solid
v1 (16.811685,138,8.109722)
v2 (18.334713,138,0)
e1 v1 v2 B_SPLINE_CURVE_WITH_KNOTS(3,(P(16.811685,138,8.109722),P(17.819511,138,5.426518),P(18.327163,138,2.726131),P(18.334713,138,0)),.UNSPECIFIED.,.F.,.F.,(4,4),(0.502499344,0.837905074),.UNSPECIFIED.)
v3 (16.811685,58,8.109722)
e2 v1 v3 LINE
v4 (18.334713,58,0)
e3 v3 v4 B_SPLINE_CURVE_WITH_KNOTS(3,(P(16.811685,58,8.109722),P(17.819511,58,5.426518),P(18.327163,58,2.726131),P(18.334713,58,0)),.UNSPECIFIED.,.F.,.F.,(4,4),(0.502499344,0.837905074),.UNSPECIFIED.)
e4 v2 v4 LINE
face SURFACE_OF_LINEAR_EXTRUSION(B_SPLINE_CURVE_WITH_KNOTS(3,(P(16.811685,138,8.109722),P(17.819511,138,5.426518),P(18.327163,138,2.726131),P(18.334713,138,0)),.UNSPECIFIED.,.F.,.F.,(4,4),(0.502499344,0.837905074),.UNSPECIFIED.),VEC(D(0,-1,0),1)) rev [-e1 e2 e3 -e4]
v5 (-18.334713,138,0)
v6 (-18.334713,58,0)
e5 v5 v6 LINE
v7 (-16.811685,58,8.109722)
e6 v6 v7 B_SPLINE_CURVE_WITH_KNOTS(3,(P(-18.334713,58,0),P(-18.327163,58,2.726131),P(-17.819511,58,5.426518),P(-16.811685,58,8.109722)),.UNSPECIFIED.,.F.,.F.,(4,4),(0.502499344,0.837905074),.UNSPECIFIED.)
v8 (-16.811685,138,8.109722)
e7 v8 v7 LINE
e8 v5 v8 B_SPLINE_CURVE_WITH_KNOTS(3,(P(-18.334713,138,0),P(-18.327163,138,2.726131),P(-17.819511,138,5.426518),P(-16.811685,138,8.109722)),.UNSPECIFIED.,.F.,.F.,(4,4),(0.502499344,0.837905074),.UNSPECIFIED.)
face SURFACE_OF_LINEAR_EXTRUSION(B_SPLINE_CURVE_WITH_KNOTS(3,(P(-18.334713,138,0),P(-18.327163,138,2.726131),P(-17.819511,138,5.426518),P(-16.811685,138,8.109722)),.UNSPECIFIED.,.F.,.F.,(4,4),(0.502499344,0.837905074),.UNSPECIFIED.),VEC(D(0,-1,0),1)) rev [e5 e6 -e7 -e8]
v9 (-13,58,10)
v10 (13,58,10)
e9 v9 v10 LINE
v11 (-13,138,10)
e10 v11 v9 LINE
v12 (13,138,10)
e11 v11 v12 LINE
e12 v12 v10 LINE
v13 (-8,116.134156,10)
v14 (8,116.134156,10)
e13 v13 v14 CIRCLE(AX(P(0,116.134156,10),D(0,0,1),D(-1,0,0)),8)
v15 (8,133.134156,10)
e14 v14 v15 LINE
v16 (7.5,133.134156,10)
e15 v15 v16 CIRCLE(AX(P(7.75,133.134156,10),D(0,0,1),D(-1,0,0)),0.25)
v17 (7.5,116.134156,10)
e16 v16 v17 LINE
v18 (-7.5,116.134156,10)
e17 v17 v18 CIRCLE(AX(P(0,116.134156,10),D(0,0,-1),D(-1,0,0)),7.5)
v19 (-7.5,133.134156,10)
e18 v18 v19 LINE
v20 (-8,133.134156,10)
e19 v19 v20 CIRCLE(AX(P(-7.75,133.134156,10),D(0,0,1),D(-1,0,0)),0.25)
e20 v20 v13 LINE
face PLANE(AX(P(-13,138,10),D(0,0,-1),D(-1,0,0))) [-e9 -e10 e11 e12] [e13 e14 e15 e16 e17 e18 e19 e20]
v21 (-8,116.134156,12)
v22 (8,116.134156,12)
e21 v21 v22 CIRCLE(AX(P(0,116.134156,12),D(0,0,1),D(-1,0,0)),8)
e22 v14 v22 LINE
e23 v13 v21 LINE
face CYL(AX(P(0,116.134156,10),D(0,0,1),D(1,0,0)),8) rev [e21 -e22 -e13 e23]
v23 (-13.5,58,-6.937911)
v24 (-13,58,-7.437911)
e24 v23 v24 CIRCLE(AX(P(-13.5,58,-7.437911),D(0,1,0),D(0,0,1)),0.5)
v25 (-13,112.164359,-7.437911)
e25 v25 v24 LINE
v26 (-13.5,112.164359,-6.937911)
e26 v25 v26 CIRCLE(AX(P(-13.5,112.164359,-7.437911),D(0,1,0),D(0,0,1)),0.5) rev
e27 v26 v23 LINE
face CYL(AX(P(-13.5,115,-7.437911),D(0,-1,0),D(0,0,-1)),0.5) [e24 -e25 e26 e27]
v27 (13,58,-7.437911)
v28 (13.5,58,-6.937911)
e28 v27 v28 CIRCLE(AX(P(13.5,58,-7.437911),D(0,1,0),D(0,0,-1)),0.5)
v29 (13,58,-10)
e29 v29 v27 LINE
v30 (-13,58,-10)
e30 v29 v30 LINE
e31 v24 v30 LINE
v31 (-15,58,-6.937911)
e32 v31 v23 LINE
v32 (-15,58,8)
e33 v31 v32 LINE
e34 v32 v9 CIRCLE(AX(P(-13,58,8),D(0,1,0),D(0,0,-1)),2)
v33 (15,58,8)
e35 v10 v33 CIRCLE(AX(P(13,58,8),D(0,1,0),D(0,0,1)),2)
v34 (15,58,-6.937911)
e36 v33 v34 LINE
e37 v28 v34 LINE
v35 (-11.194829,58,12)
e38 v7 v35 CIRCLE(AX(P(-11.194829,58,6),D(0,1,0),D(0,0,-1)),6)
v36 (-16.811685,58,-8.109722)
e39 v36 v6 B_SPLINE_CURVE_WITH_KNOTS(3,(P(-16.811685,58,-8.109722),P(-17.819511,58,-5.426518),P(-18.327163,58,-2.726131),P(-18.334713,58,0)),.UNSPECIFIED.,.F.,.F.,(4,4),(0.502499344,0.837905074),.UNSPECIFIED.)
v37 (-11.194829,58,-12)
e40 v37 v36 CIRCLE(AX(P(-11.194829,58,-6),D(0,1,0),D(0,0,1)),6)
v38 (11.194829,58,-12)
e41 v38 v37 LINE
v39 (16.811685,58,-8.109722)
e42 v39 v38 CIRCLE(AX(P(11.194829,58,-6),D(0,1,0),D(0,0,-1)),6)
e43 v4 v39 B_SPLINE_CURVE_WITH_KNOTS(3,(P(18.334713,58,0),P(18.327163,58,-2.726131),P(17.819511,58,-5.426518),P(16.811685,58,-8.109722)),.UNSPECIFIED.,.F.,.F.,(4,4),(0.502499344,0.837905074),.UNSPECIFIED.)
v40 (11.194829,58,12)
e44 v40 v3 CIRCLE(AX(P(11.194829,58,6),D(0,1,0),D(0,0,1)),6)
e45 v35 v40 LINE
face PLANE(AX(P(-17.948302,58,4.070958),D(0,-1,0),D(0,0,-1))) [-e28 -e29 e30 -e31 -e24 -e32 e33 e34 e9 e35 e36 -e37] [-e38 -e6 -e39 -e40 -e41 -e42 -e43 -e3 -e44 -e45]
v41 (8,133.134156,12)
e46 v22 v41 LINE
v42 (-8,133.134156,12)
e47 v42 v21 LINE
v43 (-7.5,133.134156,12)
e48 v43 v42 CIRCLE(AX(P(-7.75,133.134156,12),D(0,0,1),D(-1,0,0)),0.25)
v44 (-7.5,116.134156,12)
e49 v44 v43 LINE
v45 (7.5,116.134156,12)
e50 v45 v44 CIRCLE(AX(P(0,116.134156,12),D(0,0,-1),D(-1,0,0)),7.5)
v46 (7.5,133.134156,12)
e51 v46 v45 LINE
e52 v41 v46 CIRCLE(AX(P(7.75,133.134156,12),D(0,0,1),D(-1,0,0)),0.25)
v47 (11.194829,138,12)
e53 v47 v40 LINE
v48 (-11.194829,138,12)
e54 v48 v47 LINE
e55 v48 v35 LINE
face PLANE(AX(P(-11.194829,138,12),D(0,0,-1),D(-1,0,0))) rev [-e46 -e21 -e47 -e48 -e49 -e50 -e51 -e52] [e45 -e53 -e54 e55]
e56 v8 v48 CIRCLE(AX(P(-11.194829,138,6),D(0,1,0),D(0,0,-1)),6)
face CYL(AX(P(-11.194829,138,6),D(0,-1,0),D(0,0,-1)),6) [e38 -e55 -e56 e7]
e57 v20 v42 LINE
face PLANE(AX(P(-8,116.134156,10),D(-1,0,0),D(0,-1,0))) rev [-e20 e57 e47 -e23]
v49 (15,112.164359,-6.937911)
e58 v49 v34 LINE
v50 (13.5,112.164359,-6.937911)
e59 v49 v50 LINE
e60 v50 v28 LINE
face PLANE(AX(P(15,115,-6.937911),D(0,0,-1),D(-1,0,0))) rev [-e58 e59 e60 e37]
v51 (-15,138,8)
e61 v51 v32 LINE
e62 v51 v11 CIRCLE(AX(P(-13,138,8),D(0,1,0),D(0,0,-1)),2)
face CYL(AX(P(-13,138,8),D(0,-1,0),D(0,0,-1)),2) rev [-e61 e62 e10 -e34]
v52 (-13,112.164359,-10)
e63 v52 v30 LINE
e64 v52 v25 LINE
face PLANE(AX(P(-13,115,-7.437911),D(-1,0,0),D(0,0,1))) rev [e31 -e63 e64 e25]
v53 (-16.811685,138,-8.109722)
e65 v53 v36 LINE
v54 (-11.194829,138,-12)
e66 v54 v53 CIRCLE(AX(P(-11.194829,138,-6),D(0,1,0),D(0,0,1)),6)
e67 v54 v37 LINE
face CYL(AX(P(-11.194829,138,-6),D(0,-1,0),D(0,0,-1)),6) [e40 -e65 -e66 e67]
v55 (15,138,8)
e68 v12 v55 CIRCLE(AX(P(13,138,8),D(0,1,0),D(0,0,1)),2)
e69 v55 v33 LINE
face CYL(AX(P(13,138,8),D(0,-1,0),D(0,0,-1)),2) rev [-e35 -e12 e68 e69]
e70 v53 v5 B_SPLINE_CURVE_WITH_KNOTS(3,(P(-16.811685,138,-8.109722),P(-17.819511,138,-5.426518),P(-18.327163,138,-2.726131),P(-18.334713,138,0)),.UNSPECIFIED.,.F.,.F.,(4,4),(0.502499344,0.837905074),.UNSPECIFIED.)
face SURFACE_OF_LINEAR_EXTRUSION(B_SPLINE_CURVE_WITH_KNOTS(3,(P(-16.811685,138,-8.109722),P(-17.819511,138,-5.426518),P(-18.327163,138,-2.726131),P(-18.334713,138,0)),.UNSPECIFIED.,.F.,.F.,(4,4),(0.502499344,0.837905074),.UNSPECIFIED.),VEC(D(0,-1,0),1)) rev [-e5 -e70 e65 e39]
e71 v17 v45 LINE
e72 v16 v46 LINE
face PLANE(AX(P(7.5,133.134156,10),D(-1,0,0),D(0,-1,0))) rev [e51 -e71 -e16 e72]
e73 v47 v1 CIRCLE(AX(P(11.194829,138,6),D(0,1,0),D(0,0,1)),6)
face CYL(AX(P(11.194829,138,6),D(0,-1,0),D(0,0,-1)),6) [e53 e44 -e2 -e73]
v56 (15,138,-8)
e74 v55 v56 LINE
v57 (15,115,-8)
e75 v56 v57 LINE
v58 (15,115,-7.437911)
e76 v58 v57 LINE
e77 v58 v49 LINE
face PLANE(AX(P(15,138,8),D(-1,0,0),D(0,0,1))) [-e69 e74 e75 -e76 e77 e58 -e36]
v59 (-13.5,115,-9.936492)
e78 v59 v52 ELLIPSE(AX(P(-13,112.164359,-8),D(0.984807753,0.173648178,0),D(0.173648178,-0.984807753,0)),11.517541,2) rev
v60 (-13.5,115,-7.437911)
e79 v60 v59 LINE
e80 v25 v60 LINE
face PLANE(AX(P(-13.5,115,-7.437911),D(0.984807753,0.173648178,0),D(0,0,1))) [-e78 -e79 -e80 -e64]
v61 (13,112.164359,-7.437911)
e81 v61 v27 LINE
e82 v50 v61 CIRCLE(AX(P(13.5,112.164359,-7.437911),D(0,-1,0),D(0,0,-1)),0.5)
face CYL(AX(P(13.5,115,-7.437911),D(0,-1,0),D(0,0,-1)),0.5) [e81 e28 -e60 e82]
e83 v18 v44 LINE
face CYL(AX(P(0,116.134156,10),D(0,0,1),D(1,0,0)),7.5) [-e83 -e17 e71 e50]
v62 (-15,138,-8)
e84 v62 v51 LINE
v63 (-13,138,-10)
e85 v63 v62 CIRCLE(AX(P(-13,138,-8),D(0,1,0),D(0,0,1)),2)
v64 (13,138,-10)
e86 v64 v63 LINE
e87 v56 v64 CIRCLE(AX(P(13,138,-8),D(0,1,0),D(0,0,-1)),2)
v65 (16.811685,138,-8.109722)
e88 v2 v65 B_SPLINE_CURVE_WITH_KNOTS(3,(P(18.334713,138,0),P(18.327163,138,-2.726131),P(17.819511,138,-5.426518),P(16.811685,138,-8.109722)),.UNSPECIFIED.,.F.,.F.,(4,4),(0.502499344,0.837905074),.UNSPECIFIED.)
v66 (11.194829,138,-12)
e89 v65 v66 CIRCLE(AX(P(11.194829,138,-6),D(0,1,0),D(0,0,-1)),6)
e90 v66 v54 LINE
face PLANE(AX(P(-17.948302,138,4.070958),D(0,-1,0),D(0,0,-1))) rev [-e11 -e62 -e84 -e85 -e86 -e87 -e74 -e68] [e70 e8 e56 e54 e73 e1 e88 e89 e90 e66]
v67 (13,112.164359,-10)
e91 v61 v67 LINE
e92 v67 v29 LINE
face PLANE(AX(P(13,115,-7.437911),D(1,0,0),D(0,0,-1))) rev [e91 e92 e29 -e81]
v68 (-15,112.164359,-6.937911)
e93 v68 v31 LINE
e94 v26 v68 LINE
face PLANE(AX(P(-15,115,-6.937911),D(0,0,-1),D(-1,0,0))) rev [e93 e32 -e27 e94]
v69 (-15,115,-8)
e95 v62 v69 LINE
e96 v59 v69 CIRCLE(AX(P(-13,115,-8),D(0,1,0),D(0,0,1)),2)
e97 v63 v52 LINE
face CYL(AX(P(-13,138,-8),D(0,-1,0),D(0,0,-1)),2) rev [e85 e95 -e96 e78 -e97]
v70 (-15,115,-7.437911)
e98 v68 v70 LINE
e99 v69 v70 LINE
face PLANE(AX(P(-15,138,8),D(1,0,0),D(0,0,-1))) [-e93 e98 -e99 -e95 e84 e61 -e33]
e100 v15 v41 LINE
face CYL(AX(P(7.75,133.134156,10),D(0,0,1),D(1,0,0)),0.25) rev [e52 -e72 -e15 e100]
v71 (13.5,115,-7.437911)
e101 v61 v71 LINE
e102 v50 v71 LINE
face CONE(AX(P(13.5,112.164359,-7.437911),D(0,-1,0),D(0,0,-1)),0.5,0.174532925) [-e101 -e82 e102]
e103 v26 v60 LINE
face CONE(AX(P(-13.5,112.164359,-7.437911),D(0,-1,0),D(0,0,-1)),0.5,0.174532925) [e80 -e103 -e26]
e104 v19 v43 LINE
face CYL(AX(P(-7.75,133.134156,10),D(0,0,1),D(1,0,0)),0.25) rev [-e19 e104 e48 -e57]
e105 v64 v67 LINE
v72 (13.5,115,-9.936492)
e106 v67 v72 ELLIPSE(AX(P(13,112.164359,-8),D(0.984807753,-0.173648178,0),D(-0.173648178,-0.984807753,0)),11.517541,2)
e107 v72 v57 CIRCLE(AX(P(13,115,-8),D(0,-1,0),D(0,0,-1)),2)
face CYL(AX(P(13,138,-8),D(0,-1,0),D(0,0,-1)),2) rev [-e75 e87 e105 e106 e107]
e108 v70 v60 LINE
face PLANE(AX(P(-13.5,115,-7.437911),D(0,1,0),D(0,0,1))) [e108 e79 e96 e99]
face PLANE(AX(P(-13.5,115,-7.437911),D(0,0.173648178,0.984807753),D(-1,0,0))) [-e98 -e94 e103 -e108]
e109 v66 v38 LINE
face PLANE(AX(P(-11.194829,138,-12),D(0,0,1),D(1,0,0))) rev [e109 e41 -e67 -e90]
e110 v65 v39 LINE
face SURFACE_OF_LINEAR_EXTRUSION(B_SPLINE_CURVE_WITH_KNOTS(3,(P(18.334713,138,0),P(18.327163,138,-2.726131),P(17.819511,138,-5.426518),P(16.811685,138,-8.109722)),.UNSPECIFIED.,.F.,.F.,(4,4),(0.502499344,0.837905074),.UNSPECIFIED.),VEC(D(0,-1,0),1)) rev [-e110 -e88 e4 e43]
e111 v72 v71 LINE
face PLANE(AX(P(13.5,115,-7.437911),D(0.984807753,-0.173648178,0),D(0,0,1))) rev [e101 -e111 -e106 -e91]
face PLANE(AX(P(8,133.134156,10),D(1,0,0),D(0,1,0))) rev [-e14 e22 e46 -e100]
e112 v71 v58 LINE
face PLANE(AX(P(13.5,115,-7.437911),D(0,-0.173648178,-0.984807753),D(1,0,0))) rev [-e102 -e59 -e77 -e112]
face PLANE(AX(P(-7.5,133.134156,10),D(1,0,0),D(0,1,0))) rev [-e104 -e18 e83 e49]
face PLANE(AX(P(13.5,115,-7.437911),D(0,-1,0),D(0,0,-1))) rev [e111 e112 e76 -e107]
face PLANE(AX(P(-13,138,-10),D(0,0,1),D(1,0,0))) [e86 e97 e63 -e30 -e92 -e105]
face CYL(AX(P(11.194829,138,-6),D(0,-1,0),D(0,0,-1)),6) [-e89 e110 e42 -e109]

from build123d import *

# Parameters (mm, degrees)
BOSS_EXTRUDE4_DEPTH = 80
BOSS_EXTRUDE5_DEPTH = 57
CUT_EXTRUDE1_DEPTH  = 2
CHAMFER1_SIZE       = 2.83564091
CHAMFER1_SIZE_2     = 0.5


with BuildPart() as part:
    # Sketch8 → Boss-Extrude4 (new body)
    with BuildSketch(Plane(origin=(0, 58, 0), x_dir=(1, 0, 0), z_dir=(0, 1, 0))):
        with BuildLine():
            Line((-11.194828593, 12.000000011), (11.194828559, 12.000000011))
            ThreePointArc((11.194828559, 12.000000011), (14.611088941, 10.932460351), (16.811684841, 8.109721678))
            add(Edge.make_bspline(
                [(18.334712564, 1.1e-08), (18.327162677, 2.726130673), (17.819510816, 5.426517656), (16.811684841, 8.109721678)],
                knots=[0.502499344, 0.502499344, 0.502499344, 0.502499344, 0.837905074, 0.837905074, 0.837905074, 0.837905074], degree=3))
            add(Edge.make_bspline(
                [(18.334712564, 1.1e-08), (18.327162677, -2.72613065), (17.819510816, -5.426517634), (16.811684841, -8.109721656)],
                knots=[0.502499344, 0.502499344, 0.502499344, 0.502499344, 0.837905074, 0.837905074, 0.837905074, 0.837905074], degree=3))
            ThreePointArc((16.811684841, -8.109721656), (14.611088941, -10.932460328), (11.194828559, -11.999999989))
            Line((11.194828559, -11.999999989), (-11.194828593, -11.999999989))
            ThreePointArc((-11.194828593, -11.999999989), (-14.611088975, -10.932460328), (-16.811684874, -8.109721656))
            add(Edge.make_bspline(
                [(-18.334712598, 1.1e-08), (-18.327162711, -2.72613065), (-17.81951085, -5.426517634), (-16.811684874, -8.109721656)],
                knots=[0.502499344, 0.502499344, 0.502499344, 0.502499344, 0.837905074, 0.837905074, 0.837905074, 0.837905074], degree=3))
            add(Edge.make_bspline(
                [(-18.334712598, 1.1e-08), (-18.327162711, 2.726130673), (-17.81951085, 5.426517656), (-16.811684874, 8.109721678)],
                knots=[0.502499344, 0.502499344, 0.502499344, 0.502499344, 0.837905074, 0.837905074, 0.837905074, 0.837905074], degree=3))
            ThreePointArc((-16.811684874, 8.109721678), (-14.611088975, 10.932460351), (-11.194828593, 12.000000011))
        make_face()
        with BuildLine():
            Line((-15.000000017, -7.999999989), (-15.000000017, 8.000000011))
            ThreePointArc((-15.000000017, 8.000000011), (-14.414213579, 9.414213574), (-13.000000017, 10.000000011))
            Line((-13.000000017, 10.000000011), (12.999999983, 10.000000011))
            ThreePointArc((12.999999983, 10.000000011), (14.414213546, 9.414213574), (14.999999983, 8.000000011))
            Line((14.999999983, 8.000000011), (14.999999983, -7.999999989))
            ThreePointArc((14.999999983, -7.999999989), (14.414213546, -9.414213551), (12.999999983, -9.999999989))
            Line((12.999999983, -9.999999989), (-13.000000017, -9.999999989))
            ThreePointArc((-13.000000017, -9.999999989), (-14.414213579, -9.414213551), (-15.000000017, -7.999999989))
        make_face(mode=Mode.SUBTRACT)
    extrude(amount=BOSS_EXTRUDE4_DEPTH)

    # Sketch11 → Boss-Extrude5 (add)
    with BuildSketch(Plane(origin=(0, 58, 0), x_dir=(1, 0, 0), z_dir=(0, 1, 0))):
        with BuildLine():
            Line((13, 10.000000011), (15, 10.000000011))
            Line((15, 10.000000011), (15, 6.937911183))
            Line((15, 6.937911183), (13.5, 6.937911183))
            ThreePointArc((13.5, 6.937911183), (13.146446609, 7.084357793), (13, 7.437911183))
            Line((13, 7.437911183), (13, 10.000000011))
        make_face()
        with BuildLine():
            Line((-13, 7.437911183), (-13, 10.000000011))
            Line((-13, 10.000000011), (-15, 10.000000011))
            Line((-15, 10.000000011), (-15, 6.937911183))
            Line((-15, 6.937911183), (-13.5, 6.937911183))
            ThreePointArc((-13.5, 6.937911183), (-13.146446609, 7.084357793), (-13, 7.437911183))
        make_face()
    extrude(amount=BOSS_EXTRUDE5_DEPTH)

    # Sketch12 → Cut-Extrude1 (cut)
    with BuildSketch(Plane.XY.offset(11.999999989)):
        with BuildLine():
            Line((7.5, 133.134156445), (7.5, 116.134156445))
            ThreePointArc((7.5, 116.134156445), (0, 108.634156445), (-7.5, 116.134156445))
            Line((-7.5, 116.134156445), (-7.5, 133.134156445))
            ThreePointArc((-7.5, 133.134156445), (-7.75, 133.384156445), (-8, 133.134156445))
            Line((-8, 133.134156445), (-8, 116.134156445))
            ThreePointArc((-8, 116.134156445), (0, 108.134156445), (8, 116.134156445))
            Line((8, 116.134156445), (8, 133.134156445))
            ThreePointArc((8, 133.134156445), (7.75, 133.384156445), (7.5, 133.134156445))
        make_face()
    extrude(amount=-CUT_EXTRUDE1_DEPTH, mode=Mode.SUBTRACT)

    # Chamfer1
    # the kernel refuses this chamfer: 2.83564091, 0.5 mm, written as the material it takes off along each edge
    with BuildSketch(Plane(origin=(13, 115, -7.437911183), x_dir=(0, -1, 0), z_dir=(0, 0, -1))) as chamfer1_piece_1_section:
        Polygon((CHAMFER1_SIZE, 0), (0, -CHAMFER1_SIZE_2), (0, 0), align=None)
    chamfer1_piece_1 = extrude(amount=9.930611745, mode=Mode.PRIVATE)
    chamfer1_piece_1 = chamfer1_piece_1 & Plane(origin=(12.999999983, 115, -8.000000011), x_dir=(0, 0, -1), z_dir=(0, -1, 0)) * Cylinder(2, 32, mode=Mode.PRIVATE)
    add(chamfer1_piece_1, mode=Mode.SUBTRACT)
    with BuildSketch(Plane(origin=(13.5, 115, -7.437911183), x_dir=(0, 0, 1), z_dir=(1, 0, 0))) as chamfer1_piece_2:
        Polygon((0.5, CHAMFER1_SIZE), (0.5 - CHAMFER1_SIZE_2, 0), (0.5, 0), align=None)
    revolve(axis=Axis((13.5, 115, -7.437911183), (0, -1, 0)), revolution_arc=90, mode=Mode.SUBTRACT)
    with BuildSketch(Plane(origin=(15, 115, -6.937911183), x_dir=(0, -1, 0), z_dir=(-1, 0, 0))) as chamfer1_piece_3:
        Polygon((CHAMFER1_SIZE, 0), (0, -CHAMFER1_SIZE_2), (0, 0), align=None)
    extrude(amount=1.5, mode=Mode.SUBTRACT)
    with BuildSketch(Plane(origin=(-13, 115, -7.437911183), x_dir=(0, -1, 0), z_dir=(0, 0, -1))) as chamfer1_piece_4_section:
        Polygon((CHAMFER1_SIZE, 0), (0, CHAMFER1_SIZE_2), (0, 0), align=None)
    chamfer1_piece_4 = extrude(amount=9.930611745, mode=Mode.PRIVATE)
    chamfer1_piece_4 = chamfer1_piece_4 & Plane(origin=(-13.000000017, 115, -8.000000011), x_dir=(-1, 0, 0), z_dir=(0, -1, 0)) * Cylinder(2, 32, mode=Mode.PRIVATE)
    add(chamfer1_piece_4, mode=Mode.SUBTRACT)
    with BuildSketch(Plane(origin=(-15, 115, -6.937911183), x_dir=(0, -1, 0), z_dir=(1, 0, 0))) as chamfer1_piece_5:
        Polygon((CHAMFER1_SIZE, 0), (0, CHAMFER1_SIZE_2), (0, 0), align=None)
    extrude(amount=1.5, mode=Mode.SUBTRACT)
    with BuildSketch(Plane(origin=(-13.5, 115, -7.437911183), x_dir=(0, 0, 1), z_dir=(-1, 0, 0))) as chamfer1_piece_6:
        Polygon((0.5, -CHAMFER1_SIZE), (0.5 - CHAMFER1_SIZE_2, 0), (0.5, 0), align=None)
    revolve(axis=Axis((-13.5, 115, -7.437911183), (0, 1, 0)), revolution_arc=90, mode=Mode.SUBTRACT)


solid = part.part
